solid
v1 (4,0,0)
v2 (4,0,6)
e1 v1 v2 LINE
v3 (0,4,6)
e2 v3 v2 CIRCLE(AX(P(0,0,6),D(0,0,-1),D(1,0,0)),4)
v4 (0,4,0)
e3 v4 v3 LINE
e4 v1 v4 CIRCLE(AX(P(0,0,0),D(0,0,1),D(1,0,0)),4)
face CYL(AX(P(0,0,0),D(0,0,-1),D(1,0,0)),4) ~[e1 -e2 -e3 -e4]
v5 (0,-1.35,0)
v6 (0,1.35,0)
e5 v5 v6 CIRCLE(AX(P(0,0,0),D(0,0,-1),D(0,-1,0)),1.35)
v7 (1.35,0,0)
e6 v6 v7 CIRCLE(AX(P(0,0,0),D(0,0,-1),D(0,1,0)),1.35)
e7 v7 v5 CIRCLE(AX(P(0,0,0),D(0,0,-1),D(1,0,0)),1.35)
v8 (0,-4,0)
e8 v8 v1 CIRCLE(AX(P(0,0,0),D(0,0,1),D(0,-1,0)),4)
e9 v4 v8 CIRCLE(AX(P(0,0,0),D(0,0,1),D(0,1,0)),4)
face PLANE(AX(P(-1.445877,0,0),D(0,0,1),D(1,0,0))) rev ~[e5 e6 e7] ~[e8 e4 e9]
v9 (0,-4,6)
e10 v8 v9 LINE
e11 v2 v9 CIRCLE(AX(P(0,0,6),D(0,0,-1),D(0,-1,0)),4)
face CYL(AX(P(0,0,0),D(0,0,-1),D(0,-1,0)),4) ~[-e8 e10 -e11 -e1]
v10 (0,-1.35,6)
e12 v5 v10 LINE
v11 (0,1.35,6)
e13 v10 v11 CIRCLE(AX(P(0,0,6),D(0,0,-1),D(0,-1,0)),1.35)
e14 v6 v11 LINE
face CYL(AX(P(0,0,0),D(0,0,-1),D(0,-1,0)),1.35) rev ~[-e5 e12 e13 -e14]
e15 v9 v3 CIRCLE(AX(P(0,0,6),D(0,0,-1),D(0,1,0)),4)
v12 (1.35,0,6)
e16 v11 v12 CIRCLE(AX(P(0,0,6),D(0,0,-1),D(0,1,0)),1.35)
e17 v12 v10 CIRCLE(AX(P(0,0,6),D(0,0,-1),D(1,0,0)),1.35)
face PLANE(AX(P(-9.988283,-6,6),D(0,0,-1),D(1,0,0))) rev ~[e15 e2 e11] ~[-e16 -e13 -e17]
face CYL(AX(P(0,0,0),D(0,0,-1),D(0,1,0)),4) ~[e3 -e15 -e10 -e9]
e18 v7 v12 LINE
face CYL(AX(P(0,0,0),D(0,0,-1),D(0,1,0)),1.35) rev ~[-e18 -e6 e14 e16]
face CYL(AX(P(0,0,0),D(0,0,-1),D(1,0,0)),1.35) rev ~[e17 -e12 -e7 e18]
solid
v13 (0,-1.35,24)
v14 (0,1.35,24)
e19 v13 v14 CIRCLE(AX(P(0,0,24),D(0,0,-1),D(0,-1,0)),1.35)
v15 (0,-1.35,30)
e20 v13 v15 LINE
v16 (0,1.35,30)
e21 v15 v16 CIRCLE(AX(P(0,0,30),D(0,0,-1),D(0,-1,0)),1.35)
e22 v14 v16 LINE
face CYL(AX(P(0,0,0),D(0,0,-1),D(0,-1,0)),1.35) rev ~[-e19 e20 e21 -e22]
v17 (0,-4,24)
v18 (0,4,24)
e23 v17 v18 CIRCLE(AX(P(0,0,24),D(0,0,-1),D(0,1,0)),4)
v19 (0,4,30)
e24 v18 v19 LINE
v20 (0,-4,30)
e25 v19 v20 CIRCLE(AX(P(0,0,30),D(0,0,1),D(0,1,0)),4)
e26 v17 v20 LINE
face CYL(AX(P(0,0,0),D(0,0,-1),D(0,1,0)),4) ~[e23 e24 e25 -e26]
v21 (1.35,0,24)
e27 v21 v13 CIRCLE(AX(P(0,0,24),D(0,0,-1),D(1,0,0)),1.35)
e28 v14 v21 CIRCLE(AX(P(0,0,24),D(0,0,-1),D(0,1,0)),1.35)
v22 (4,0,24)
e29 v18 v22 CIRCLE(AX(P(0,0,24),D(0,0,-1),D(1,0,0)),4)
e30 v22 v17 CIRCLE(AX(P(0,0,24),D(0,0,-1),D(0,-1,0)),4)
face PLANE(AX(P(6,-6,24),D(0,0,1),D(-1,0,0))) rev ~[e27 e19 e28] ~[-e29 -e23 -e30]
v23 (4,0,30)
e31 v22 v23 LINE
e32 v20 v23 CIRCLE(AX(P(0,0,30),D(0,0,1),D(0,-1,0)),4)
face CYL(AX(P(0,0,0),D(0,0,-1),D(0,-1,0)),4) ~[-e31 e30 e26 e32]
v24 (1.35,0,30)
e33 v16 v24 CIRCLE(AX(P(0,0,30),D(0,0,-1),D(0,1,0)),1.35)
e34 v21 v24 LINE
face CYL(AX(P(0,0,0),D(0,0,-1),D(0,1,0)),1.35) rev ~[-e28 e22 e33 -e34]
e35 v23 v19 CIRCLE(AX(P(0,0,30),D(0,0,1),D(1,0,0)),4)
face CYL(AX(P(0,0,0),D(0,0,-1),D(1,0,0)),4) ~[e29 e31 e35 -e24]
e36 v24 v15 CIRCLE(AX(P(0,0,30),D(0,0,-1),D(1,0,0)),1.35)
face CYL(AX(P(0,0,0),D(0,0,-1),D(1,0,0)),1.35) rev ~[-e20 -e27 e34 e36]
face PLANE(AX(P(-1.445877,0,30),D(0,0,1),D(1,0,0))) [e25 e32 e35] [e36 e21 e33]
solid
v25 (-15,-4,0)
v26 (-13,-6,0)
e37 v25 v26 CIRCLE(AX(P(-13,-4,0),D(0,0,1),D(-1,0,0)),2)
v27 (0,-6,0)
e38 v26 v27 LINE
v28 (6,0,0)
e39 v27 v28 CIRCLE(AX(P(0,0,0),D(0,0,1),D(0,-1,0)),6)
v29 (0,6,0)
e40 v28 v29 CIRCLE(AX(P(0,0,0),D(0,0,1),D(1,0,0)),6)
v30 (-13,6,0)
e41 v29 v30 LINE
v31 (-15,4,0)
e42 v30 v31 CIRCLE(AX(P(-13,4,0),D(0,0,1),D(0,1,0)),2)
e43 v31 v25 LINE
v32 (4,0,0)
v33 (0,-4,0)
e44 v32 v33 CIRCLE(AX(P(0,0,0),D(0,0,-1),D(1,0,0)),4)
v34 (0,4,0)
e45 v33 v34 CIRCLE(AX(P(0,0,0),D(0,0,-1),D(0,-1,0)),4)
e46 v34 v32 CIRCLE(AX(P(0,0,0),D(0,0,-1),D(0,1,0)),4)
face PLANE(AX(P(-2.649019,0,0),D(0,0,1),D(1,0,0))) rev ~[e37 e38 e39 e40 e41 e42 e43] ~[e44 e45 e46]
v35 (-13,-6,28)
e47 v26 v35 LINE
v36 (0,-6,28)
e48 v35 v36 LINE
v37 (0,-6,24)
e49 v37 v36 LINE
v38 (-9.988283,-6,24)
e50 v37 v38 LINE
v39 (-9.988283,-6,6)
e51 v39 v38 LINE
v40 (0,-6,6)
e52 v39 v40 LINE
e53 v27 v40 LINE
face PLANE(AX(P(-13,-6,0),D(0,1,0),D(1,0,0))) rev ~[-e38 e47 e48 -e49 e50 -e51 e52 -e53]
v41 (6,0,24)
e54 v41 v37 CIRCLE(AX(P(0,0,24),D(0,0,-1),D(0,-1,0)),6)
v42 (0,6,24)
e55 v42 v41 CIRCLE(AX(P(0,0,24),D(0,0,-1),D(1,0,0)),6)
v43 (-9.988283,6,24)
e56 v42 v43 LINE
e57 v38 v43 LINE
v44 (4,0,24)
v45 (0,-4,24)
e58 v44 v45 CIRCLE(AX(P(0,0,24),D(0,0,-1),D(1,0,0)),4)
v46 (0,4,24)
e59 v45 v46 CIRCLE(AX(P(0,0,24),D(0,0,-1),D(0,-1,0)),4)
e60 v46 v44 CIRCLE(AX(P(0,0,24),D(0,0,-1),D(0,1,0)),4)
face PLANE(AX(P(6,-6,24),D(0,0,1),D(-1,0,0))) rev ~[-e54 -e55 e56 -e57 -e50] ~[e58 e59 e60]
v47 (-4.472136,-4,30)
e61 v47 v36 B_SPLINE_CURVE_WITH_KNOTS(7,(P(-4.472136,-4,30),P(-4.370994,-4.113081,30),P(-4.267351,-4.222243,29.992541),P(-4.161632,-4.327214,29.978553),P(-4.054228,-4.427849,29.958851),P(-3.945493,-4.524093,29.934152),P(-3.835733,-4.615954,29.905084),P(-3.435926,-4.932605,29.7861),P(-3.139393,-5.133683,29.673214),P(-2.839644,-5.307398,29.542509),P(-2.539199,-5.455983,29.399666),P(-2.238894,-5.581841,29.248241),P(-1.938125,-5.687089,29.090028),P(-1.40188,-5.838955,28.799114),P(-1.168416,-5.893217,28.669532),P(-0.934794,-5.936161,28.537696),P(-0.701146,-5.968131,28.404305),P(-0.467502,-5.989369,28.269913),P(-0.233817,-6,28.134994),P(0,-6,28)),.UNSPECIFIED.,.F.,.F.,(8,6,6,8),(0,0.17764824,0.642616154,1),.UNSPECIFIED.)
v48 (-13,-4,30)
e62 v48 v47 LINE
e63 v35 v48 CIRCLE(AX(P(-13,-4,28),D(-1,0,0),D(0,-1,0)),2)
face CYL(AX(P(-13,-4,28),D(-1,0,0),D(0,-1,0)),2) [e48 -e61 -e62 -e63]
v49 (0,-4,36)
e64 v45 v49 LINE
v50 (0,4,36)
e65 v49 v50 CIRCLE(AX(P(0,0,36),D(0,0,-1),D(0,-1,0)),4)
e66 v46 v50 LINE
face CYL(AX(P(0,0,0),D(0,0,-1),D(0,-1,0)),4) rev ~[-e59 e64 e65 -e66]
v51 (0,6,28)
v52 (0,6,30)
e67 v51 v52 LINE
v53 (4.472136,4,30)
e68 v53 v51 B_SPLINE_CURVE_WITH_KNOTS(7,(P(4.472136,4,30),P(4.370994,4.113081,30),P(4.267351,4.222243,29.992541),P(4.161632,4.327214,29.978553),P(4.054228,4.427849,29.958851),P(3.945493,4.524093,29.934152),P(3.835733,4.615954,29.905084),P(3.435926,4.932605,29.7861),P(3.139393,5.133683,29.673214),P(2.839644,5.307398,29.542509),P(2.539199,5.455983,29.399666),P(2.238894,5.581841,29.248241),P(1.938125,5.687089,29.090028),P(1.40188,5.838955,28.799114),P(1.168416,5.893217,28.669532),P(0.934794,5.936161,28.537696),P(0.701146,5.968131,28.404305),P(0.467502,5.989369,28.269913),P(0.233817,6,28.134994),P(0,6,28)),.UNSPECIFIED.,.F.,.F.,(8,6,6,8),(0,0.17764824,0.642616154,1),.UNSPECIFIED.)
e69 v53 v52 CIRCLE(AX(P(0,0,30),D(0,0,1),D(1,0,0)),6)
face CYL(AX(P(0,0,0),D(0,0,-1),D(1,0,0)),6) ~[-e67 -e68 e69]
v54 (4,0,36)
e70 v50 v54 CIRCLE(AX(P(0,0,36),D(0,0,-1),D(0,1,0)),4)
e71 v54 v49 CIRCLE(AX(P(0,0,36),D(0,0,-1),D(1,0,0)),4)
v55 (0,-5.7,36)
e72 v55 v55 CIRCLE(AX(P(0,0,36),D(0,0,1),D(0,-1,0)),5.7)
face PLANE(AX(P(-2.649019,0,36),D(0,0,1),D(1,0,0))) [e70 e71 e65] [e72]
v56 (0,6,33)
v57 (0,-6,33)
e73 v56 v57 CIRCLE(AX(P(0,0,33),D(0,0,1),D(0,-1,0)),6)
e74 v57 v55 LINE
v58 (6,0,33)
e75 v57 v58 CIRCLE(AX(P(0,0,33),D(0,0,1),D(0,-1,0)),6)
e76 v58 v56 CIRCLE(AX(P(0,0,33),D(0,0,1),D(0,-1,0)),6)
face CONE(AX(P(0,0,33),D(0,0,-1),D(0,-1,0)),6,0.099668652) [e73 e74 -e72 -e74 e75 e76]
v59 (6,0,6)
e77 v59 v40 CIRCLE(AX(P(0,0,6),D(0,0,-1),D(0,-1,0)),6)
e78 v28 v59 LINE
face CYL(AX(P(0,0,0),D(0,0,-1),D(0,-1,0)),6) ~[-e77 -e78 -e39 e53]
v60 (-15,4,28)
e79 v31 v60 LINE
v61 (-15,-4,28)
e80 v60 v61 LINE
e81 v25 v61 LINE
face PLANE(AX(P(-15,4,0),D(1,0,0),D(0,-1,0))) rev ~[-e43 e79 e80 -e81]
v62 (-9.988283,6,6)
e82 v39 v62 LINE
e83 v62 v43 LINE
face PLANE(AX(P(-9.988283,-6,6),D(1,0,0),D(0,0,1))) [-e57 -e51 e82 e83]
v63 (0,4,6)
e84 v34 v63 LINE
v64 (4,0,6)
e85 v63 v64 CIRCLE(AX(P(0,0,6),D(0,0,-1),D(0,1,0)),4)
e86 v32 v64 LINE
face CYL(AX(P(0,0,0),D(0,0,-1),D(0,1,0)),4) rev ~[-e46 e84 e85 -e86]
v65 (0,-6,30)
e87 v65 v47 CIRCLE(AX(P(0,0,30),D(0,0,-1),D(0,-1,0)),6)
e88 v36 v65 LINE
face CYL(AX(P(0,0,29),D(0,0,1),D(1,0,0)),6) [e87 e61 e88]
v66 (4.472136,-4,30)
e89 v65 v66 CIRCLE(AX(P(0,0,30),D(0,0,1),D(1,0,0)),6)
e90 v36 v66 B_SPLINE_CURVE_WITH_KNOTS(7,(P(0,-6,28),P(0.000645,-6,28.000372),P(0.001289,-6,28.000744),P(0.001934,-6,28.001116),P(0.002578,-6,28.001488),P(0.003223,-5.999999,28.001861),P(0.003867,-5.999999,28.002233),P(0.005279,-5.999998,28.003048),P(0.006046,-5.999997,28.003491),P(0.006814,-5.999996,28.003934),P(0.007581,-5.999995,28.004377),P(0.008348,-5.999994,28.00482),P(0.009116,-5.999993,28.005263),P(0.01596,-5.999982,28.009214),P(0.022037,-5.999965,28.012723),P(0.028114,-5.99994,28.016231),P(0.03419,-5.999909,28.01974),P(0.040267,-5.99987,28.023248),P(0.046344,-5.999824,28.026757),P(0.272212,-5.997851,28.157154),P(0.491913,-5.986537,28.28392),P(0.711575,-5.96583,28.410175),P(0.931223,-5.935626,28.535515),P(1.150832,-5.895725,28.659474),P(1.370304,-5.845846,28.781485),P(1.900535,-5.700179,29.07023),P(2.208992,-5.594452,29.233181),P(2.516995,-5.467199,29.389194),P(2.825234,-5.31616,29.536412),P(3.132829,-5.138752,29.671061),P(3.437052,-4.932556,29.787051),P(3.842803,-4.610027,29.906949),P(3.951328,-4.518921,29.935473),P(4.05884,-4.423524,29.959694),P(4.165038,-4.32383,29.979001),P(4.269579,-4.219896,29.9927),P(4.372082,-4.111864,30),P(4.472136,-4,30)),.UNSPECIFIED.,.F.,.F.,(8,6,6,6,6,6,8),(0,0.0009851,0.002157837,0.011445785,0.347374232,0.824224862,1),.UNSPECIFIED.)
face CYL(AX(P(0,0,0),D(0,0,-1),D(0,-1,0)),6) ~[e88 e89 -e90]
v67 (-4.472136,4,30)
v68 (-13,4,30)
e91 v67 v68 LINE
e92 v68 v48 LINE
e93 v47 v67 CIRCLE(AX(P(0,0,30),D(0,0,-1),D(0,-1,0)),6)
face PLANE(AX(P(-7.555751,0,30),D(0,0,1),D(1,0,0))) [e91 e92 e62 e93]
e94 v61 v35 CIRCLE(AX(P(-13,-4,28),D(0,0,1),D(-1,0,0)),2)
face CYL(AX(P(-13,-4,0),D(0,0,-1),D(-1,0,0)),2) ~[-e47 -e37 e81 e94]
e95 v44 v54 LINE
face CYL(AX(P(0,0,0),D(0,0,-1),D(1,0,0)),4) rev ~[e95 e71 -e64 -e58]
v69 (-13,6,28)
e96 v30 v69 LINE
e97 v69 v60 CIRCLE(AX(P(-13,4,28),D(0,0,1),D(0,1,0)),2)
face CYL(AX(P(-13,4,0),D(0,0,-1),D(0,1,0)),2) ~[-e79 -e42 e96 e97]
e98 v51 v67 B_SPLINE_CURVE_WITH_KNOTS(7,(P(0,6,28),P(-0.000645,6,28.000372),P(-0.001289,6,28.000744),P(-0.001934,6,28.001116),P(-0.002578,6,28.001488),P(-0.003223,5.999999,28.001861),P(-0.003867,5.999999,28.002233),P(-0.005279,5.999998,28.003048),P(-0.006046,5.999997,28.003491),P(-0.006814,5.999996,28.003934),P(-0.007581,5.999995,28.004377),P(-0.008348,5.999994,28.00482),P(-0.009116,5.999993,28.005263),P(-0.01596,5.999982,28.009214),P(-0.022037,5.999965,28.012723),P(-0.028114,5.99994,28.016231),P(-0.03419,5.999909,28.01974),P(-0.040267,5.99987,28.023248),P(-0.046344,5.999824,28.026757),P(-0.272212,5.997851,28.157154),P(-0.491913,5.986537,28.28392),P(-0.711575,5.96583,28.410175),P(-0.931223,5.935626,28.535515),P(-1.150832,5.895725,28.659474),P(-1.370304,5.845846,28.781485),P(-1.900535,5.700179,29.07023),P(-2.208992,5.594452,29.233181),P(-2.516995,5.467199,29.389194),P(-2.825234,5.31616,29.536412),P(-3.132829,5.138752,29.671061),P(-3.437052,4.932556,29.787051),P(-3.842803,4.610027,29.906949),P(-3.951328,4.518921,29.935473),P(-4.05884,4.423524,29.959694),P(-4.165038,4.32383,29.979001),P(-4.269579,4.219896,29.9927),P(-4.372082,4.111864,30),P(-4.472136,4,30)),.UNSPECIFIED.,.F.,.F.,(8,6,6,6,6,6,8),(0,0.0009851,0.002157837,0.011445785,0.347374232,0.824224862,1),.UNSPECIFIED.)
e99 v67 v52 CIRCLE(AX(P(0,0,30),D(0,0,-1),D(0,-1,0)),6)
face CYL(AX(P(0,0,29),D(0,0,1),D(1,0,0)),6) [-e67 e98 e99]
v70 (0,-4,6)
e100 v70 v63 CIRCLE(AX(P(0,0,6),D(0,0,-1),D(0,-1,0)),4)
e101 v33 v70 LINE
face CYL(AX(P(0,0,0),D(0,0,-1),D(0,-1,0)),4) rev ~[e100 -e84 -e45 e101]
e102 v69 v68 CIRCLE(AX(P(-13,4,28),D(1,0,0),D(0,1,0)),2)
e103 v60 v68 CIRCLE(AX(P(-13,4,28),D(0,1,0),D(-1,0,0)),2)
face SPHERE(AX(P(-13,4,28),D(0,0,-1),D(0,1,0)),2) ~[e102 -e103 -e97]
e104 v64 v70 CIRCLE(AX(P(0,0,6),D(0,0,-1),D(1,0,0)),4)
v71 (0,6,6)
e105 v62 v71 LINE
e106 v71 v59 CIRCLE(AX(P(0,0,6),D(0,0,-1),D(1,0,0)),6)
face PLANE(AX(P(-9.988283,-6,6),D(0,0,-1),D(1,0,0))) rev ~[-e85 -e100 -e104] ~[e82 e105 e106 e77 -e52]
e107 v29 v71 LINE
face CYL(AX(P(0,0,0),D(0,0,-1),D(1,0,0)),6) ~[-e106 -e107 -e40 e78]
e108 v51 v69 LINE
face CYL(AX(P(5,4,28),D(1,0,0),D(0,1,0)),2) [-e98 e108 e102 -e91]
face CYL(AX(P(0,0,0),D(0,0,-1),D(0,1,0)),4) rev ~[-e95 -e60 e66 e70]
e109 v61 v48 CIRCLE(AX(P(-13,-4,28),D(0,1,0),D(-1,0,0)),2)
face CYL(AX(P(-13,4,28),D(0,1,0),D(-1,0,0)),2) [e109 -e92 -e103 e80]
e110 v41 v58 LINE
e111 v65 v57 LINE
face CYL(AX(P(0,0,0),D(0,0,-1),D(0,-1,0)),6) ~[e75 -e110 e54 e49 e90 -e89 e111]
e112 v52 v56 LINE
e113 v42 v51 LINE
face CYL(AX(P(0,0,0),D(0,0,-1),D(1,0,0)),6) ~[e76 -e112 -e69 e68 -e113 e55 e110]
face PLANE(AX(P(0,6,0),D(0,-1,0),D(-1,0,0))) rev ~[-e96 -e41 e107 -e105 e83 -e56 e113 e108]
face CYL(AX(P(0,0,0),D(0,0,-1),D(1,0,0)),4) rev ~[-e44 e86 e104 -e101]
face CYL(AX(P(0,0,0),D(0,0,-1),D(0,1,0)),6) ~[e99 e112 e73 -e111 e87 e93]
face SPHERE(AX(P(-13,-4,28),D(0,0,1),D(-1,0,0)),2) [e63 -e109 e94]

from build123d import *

# Parameters (mm, degrees)
F4_DEPTH     = 30
F5_DEPTH     = 36
F6_W         = 9.9882828072
F6_H         = 18
F6_W_2       = 6
F7_DEPTH     = 25
F1_DEPTH     = 25
F2_T1_DEPTH  = 8
F2_T6_DEPTH  = 18
F2_S7_R      = 6
F2_T8_DEPTH  = 11
F2_T12_DEPTH = 18
F2_S13_R     = 6
F2_T14_DEPTH = 11
F2_T16_ANGLE = 90
F2_T18_ANGLE = 90


# Not quite as in the source:
# - a fillet or chamfer that OpenCascade refuses, or shapes differently, is made with other operations: its cross-section is extruded or revolved along the edge and cut away or added


with BuildPart() as f4:
    # F3 (on Top) → F4 (new body)
    with BuildSketch(Plane.XY):
        with BuildLine():
            Line((0, 1.35), (0, 4))
            ThreePointArc((0, 4), (-4, 0), (0, -4))
            Line((0, -4), (0, -1.35))
            ThreePointArc((0, -1.35), (-1.35, 0), (0, 1.35))
        make_face()
        with BuildLine():
            ThreePointArc((4, 0), (2.8284271247, 2.8284271247), (0, 4))
            Line((0, 4), (0, 1.35))
            ThreePointArc((0, 1.35), (0.9545941546, 0.9545941546), (1.35, 0))
            ThreePointArc((1.35, 0), (0.9545941546, -0.9545941546), (0, -1.35))
            Line((0, -1.35), (0, -4))
            ThreePointArc((0, -4), (2.8284271247, -2.8284271247), (4, 0))
        make_face()
    extrude(amount=F4_DEPTH)


with BuildPart() as f4b:
    # F3 (on Top) → F4, piece 2 (new body)
    with BuildSketch(Plane.XY):
        with BuildLine():
            ThreePointArc((0, -6), (-6, 0), (0, 6))
            Line((0, 6), (-13, 6))
            ThreePointArc((-13, 6), (-14.4142135624, 5.4142135624), (-15, 4))
            Line((-15, 4), (-15, -4))
            ThreePointArc((-15, -4), (-14.4142135624, -5.4142135624), (-13, -6))
            Line((-13, -6), (0, -6))
        make_face()
    extrude(amount=F4_DEPTH)

    # F3 (on Top) → F5 (join)
    with BuildSketch(Plane.XY):
        with BuildLine():
            Line((0, 4), (0, 6))
            ThreePointArc((0, 6), (-6, 0), (0, -6))
            Line((0, -6), (0, -4))
            ThreePointArc((0, -4), (-4, 0), (0, 4))
        make_face()
        with BuildLine():
            ThreePointArc((0, -6), (4.2426406871, -4.2426406871), (6, 0))
            ThreePointArc((6, 0), (4.2426406871, 4.2426406871), (0, 6))
            Line((0, 6), (0, 4))
            ThreePointArc((0, 4), (2.8284271247, 2.8284271247), (4, 0))
            ThreePointArc((4, 0), (2.8284271247, -2.8284271247), (0, -4))
            Line((0, -4), (0, -6))
        make_face()
    extrude(amount=F5_DEPTH)

    # F0: chamfer of 3 x 0.3 on 1 edges, made by hand

    # F0_s1 → F0_t2 (revolve, cut)
    with BuildSketch(Plane.YZ):
        Polygon((-6, 33), (-5.7, 36), (-6, 36), align=None)
    revolve(axis=Axis((0, 0, 36), (0, 0, 1)), mode=Mode.SUBTRACT)


with BuildPart() as f7_tool:
    # F6 (on face) → F7 (new body)
    with BuildSketch(Plane.XZ.offset(6)):
        with Locations((-4.9941414036, 15)):
            Rectangle(F6_W, F6_H)
        with Locations((3, 15)):
            Rectangle(F6_W_2, F6_H)
    extrude(amount=-F7_DEPTH)


with BuildPart() as f4_1:
    add(f4.part)

    # F7: cut by f7_tool
    add(f7_tool.part, mode=Mode.SUBTRACT)

    # F6 (on face) → F1 (cut)
    with BuildSketch(Plane.XZ.offset(6)):
        with Locations((-4.9941414036, 15)):
            Rectangle(F6_W, F6_H)
        with Locations((3, 15)):
            Rectangle(F6_W_2, F6_H)
    extrude(amount=F1_DEPTH, mode=Mode.SUBTRACT)


with BuildPart() as f4b_1:
    add(f4b.part)

    # F7: cut by f7_tool
    add(f7_tool.part, mode=Mode.SUBTRACT)

    # F2: fillet of radius 2 on 5 edges, made by hand

    # F2_s2 → F2_t1 (cut)
    with BuildSketch(Plane.XZ.offset(-4)):
        with BuildLine():
            ThreePointArc((-15, 28), (-14.4142135624, 29.4142135624), (-13, 30))
            Line((-13, 30), (-15, 30))
            Line((-15, 30), (-15, 28))
        make_face()
    extrude(amount=F2_T1_DEPTH, mode=Mode.SUBTRACT)


with BuildPart() as f2_tool4:
    # F2_s5 → F2_t6 (new body)
    with BuildSketch(Plane.YZ.offset(5)):
        with BuildLine():
            ThreePointArc((6, 28), (5.4142135624, 29.4142135624), (4, 30))
            Line((4, 30), (6, 30))
            Line((6, 30), (6, 28))
        make_face()
    extrude(amount=-F2_T6_DEPTH)

    # F2_s7 → F2_t8 (cut, symmetric)
    with BuildSketch(Plane.XY.offset(29)):
        Circle(F2_S7_R)
    extrude(amount=F2_T8_DEPTH, both=True, mode=Mode.SUBTRACT)


with BuildPart() as f4b_2:
    add(f4b_1.part)

    # F2_t3: cut F2_tool4
    add(f2_tool4.part, mode=Mode.SUBTRACT)


with BuildPart() as f2_tool10:
    # F2_s11 → F2_t12 (new body)
    with BuildSketch(Plane.YZ.offset(-13)):
        with BuildLine():
            ThreePointArc((-6, 28), (-5.4142135624, 29.4142135624), (-4, 30))
            Line((-4, 30), (-6, 30))
            Line((-6, 30), (-6, 28))
        make_face()
    extrude(amount=F2_T12_DEPTH)

    # F2_s13 → F2_t14 (cut, symmetric)
    with BuildSketch(Plane.XY.offset(29)):
        Circle(F2_S13_R)
    extrude(amount=F2_T14_DEPTH, both=True, mode=Mode.SUBTRACT)


with BuildPart() as f4b_3:
    add(f4b_2.part)

    # F2_t9: cut F2_tool10
    add(f2_tool10.part, mode=Mode.SUBTRACT)

    # F2_s15 → F2_t16 (revolve, cut)
    with BuildSketch(Plane.XZ.offset(4)):
        with BuildLine():
            ThreePointArc((-15, 28), (-14.4142135624, 29.4142135624), (-13, 30))
            Line((-13, 30), (-15, 30))
            Line((-15, 30), (-15, 28))
        make_face()
    revolve(axis=Axis((-13, -4, 30), (0, 0, 1)), revolution_arc=F2_T16_ANGLE, mode=Mode.SUBTRACT)

    # F2_s17 → F2_t18 (revolve, cut)
    with BuildSketch(Plane.YZ.offset(-13)):
        with BuildLine():
            ThreePointArc((4, 30), (5.4142135624, 29.4142135624), (6, 28))
            Line((6, 28), (6, 30))
            Line((6, 30), (4, 30))
        make_face()
    revolve(axis=Axis((-13, 4, 30), (0, 0, 1)), revolution_arc=F2_T18_ANGLE, mode=Mode.SUBTRACT)


solid = Compound([f4_1.part, f4b_3.part])
